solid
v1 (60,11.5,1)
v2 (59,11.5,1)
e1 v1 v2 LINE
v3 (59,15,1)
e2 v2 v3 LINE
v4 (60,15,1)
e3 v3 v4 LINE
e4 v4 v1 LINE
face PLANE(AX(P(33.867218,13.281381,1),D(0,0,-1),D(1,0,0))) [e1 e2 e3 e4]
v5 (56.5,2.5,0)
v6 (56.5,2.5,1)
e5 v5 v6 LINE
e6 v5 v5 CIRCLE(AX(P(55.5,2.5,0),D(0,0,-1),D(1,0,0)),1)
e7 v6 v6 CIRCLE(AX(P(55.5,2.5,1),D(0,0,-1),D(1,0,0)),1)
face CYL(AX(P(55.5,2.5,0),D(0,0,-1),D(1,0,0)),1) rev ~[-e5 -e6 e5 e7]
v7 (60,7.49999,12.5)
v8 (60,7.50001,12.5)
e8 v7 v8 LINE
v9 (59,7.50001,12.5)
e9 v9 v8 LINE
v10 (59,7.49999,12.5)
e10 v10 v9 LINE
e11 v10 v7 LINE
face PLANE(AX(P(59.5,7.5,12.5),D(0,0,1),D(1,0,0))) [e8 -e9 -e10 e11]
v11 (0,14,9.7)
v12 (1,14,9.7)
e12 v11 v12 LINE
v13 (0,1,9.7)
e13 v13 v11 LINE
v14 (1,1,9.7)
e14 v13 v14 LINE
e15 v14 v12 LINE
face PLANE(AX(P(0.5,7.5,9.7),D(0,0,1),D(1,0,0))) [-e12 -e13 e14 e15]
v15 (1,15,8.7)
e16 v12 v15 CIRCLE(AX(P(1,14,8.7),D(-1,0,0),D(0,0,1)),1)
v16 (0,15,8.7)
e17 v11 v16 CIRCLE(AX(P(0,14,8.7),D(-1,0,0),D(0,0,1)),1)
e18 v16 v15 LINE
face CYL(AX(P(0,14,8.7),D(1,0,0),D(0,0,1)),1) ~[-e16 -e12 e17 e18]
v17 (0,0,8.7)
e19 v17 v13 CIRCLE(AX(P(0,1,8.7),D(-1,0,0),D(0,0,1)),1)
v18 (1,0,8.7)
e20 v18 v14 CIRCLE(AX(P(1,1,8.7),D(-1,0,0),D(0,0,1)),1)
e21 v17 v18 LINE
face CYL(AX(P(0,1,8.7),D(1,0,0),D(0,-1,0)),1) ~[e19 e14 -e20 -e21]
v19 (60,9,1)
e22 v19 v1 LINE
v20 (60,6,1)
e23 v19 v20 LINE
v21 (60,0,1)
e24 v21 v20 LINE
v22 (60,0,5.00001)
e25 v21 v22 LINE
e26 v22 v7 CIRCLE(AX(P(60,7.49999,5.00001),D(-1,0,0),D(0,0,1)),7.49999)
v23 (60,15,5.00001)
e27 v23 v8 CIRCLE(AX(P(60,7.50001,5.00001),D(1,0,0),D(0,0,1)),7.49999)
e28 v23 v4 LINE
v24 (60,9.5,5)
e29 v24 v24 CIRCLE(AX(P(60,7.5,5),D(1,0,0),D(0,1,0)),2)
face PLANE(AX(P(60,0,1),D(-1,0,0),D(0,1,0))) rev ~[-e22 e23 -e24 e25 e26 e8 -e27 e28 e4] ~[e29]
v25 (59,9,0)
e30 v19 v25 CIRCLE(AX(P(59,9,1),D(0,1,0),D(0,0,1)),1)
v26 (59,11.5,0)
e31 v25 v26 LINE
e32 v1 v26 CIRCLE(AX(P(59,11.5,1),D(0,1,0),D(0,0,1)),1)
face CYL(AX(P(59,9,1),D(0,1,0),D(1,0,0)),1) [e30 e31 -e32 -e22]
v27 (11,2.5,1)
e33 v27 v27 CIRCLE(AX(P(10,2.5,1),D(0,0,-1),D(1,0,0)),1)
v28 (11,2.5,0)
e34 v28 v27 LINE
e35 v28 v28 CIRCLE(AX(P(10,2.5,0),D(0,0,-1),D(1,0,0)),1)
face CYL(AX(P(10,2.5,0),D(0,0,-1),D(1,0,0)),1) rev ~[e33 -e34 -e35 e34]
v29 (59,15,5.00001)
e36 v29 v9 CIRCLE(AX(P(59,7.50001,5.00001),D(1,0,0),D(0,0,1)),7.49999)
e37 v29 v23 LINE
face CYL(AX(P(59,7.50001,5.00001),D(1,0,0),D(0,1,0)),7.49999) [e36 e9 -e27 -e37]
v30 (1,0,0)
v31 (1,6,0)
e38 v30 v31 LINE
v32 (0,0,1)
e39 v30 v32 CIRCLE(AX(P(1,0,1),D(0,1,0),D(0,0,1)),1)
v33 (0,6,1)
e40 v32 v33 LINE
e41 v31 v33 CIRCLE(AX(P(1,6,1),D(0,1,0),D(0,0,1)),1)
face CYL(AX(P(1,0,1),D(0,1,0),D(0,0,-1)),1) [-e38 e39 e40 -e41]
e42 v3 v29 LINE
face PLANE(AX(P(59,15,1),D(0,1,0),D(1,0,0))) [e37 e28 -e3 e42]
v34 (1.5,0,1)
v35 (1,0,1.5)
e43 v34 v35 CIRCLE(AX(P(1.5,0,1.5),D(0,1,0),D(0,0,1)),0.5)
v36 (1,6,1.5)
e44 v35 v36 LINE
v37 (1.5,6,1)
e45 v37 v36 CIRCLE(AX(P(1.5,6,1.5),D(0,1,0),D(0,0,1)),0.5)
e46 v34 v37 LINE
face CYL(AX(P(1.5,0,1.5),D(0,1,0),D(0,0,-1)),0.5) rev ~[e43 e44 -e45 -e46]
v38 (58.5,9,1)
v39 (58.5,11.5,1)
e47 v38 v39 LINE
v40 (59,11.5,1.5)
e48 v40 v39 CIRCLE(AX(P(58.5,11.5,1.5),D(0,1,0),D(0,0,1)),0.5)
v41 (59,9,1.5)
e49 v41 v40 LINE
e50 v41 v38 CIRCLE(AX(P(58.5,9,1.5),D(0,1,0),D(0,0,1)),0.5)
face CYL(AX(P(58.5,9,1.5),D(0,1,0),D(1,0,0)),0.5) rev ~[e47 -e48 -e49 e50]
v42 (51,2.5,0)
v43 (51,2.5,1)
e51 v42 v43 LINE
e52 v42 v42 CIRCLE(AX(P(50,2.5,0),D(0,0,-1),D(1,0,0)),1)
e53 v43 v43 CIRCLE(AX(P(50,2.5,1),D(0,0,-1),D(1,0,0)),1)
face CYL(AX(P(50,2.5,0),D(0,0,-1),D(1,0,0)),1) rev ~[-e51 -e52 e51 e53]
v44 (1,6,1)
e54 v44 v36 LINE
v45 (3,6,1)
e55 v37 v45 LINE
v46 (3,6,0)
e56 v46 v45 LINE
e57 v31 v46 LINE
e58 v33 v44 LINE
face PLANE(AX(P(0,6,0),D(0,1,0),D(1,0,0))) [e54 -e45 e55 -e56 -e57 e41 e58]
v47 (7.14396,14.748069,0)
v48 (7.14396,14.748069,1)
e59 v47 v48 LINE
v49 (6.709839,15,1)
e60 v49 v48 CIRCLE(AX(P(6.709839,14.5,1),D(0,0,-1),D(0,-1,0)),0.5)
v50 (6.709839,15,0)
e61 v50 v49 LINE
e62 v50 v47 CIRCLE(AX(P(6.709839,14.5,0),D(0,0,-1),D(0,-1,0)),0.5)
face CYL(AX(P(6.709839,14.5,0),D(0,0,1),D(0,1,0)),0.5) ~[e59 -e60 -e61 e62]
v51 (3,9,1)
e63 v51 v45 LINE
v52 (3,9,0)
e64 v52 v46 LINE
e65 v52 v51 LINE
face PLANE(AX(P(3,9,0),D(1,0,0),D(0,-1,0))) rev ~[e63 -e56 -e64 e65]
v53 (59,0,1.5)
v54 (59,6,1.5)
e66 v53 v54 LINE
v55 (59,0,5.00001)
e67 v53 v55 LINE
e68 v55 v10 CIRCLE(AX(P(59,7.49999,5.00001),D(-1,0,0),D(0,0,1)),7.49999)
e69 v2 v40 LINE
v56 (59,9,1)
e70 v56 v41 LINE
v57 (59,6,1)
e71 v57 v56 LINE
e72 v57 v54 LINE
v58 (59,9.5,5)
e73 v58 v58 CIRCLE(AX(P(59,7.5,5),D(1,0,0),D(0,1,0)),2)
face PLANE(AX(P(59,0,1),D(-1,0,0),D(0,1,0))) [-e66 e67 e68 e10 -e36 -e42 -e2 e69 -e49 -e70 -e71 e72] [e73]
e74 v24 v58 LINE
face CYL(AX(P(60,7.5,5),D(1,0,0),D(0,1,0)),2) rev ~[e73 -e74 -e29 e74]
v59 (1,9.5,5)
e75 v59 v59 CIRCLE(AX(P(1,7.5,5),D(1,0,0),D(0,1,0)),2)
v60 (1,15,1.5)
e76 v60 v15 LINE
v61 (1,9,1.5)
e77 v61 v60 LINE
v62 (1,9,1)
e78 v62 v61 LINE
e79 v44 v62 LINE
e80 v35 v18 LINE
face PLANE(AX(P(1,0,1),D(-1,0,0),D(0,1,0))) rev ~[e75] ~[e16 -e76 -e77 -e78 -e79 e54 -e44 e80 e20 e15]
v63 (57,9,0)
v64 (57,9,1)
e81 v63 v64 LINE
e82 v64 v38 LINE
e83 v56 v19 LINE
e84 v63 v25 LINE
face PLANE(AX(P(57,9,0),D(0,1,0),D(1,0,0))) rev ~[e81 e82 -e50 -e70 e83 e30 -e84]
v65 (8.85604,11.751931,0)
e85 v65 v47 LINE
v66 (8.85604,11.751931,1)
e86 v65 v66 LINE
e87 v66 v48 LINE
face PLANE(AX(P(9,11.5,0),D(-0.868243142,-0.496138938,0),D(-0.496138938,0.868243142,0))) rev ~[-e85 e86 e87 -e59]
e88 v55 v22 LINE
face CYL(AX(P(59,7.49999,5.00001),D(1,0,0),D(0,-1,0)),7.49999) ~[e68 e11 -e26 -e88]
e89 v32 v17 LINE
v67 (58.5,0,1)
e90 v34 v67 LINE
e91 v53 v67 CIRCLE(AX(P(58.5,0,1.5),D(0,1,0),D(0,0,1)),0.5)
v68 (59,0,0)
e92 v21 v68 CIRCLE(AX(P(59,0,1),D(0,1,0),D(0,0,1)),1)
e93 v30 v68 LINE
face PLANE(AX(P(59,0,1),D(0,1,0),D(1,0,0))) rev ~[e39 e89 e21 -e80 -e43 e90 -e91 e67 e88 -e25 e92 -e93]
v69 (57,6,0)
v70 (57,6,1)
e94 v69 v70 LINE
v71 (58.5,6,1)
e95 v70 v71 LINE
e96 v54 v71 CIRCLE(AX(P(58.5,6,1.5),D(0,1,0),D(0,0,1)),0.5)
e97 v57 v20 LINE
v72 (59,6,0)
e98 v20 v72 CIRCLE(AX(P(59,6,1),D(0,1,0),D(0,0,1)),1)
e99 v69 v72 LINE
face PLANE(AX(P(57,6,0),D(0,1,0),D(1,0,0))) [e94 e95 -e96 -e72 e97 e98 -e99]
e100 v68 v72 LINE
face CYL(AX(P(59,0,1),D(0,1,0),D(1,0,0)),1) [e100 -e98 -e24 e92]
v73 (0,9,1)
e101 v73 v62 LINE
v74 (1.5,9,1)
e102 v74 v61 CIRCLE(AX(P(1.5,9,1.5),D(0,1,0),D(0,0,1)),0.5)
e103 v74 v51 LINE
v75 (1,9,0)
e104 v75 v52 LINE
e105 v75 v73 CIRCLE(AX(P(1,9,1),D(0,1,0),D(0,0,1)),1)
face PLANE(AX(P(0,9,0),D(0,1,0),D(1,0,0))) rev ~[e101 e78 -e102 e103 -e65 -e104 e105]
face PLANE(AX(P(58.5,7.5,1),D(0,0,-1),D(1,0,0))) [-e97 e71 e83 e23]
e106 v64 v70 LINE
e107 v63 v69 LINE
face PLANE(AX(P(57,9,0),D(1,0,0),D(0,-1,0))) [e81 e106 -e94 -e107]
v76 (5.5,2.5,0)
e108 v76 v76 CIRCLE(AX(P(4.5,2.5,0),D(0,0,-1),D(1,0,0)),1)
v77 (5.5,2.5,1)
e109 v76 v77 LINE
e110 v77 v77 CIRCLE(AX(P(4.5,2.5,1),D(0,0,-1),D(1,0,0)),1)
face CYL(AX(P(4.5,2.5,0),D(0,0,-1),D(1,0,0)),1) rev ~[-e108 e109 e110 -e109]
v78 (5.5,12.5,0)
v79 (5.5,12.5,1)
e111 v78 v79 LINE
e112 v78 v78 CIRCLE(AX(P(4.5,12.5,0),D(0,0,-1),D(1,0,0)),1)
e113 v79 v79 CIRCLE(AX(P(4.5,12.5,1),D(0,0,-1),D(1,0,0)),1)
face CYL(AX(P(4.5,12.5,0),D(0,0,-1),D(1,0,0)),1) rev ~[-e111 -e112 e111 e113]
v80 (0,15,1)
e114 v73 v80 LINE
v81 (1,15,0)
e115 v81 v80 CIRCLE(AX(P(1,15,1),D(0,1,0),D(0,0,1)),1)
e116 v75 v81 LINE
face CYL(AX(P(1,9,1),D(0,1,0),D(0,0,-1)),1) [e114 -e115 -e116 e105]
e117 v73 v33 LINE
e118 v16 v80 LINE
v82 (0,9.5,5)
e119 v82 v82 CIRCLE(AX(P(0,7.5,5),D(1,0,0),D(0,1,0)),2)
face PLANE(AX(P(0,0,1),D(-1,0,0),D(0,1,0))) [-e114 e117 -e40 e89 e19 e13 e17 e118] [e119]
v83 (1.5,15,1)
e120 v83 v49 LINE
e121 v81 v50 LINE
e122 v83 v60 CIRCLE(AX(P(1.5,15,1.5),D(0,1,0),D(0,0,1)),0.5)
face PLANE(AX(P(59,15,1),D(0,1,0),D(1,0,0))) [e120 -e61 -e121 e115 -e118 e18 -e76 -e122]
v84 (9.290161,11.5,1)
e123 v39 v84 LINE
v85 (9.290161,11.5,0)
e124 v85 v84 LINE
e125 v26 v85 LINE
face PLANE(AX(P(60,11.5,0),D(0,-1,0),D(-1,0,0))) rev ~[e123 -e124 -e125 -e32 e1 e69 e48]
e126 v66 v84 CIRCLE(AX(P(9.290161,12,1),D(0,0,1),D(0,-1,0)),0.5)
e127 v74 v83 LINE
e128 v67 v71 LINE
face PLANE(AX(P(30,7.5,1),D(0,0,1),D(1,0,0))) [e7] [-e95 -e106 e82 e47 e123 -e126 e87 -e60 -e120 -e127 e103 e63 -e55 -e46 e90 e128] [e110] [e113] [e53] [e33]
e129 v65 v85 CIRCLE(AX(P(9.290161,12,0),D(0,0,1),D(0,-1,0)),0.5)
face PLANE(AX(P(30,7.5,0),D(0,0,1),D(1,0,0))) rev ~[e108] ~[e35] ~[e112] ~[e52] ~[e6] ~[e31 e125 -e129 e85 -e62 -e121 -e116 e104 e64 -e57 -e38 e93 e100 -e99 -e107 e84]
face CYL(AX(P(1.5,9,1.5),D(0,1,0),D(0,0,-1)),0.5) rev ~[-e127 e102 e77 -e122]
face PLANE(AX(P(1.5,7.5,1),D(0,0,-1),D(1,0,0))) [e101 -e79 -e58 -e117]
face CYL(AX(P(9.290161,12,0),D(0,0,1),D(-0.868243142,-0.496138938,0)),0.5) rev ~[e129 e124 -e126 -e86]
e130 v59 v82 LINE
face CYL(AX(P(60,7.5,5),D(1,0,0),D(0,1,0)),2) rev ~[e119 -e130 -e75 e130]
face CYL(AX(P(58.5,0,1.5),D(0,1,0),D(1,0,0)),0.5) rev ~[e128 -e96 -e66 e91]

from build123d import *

# Parameters (mm, degrees)
F0_W      = 60
F0_H      = 15
F1_DEPTH  = 1
F2_W      = 1
F2_H      = 15
F3_DEPTH  = 8.7
F4_W      = 1
F4_H      = 15
F5_DEPTH  = 11.5
F6_W      = 3
F6_H      = 3
F6_R      = 1
F7_DEPTH  = 1
F8_R      = 7.49999
F9_R      = 0.5
F10_R     = 1
F11_R     = 2
F12_DEPTH = 60.001


# Not quite as in the source:
# - a fillet or chamfer is up to 0.001 mm smaller than in the source, because OpenCascade refuses the exact size


with BuildPart() as f1:
    # F0 (on Top) → F1 (new body)
    with BuildSketch(Plane.XY):
        with Locations((30, 7.5)):
            Rectangle(F0_W, F0_H)
    extrude(amount=F1_DEPTH)

    # F2 (on face) → F3 (join)
    with BuildSketch(Plane.XY.offset(1)):
        with Locations((0.5, 7.5)):
            Rectangle(F2_W, F2_H)
    extrude(amount=F3_DEPTH)

    # F4 (on face) → F5 (join)
    with BuildSketch(Plane.XY.offset(1)):
        with Locations((59.5, 7.5)):
            Rectangle(F4_W, F4_H)
    extrude(amount=F5_DEPTH)

    # F6 (on face) → F7 (cut, through all)
    with BuildSketch(Plane(origin=(0, 0, 0), x_dir=(1, 0, 0), z_dir=(0, 0, -1))):
        with Locations((1.5, -7.5)):
            Rectangle(F6_W, F6_H)
        with Locations((4.5, -2.5)):
            Circle(F6_R)
        with Locations((10, -2.5)):
            Circle(F6_R)
        with Locations((50, -2.5)):
            Circle(F6_R)
        with Locations((55.5, -2.5)):
            Circle(F6_R)
        with Locations((58.5, -7.5)):
            Rectangle(F6_W, F6_H)
        with Locations((4.5, -12.5)):
            Circle(F6_R)
        Polygon((9, -11.5), (7, -15), (60, -15), (60, -11.5), align=None)
    extrude(amount=-F7_DEPTH, mode=Mode.SUBTRACT)

    # F8 (radius 7.5 in the source; OpenCascade refuses exactly that, so slightly less here)
    f8_edges = [f1.edges().sort_by_distance(p)[0] for p in [
        (59.5, 0, 12.5),
        (59.5, 15, 12.5),
    ]]
    fillet(f8_edges, radius=F8_R)

    # F9
    f9_edges = [f1.edges().sort_by_distance(p)[0] for p in [
        (59, 3, 1),
        (59, 10.25, 1),
        (1, 3, 1),
        (1, 12, 1),
        (7, 15, 0.5),
        (9, 11.5, 0.5),
    ]]
    fillet(f9_edges, radius=F9_R)

    # F10
    f10_edges = [f1.edges().sort_by_distance(p)[0] for p in [
        (60, 10.25, 0),
        (60, 3, 0),
        (0, 12, 0),
        (0, 3, 0),
        (0.5, 0, 9.7),
        (0.5, 15, 9.7),
    ]]
    fillet(f10_edges, radius=F10_R)

    # F11 (on face) → F12 (cut, through all)
    with BuildSketch(Plane.YZ.offset(60)):
        with Locations((7.5, 5)):
            Circle(F11_R)
    extrude(amount=-F12_DEPTH, mode=Mode.SUBTRACT)


solid = f1.part
